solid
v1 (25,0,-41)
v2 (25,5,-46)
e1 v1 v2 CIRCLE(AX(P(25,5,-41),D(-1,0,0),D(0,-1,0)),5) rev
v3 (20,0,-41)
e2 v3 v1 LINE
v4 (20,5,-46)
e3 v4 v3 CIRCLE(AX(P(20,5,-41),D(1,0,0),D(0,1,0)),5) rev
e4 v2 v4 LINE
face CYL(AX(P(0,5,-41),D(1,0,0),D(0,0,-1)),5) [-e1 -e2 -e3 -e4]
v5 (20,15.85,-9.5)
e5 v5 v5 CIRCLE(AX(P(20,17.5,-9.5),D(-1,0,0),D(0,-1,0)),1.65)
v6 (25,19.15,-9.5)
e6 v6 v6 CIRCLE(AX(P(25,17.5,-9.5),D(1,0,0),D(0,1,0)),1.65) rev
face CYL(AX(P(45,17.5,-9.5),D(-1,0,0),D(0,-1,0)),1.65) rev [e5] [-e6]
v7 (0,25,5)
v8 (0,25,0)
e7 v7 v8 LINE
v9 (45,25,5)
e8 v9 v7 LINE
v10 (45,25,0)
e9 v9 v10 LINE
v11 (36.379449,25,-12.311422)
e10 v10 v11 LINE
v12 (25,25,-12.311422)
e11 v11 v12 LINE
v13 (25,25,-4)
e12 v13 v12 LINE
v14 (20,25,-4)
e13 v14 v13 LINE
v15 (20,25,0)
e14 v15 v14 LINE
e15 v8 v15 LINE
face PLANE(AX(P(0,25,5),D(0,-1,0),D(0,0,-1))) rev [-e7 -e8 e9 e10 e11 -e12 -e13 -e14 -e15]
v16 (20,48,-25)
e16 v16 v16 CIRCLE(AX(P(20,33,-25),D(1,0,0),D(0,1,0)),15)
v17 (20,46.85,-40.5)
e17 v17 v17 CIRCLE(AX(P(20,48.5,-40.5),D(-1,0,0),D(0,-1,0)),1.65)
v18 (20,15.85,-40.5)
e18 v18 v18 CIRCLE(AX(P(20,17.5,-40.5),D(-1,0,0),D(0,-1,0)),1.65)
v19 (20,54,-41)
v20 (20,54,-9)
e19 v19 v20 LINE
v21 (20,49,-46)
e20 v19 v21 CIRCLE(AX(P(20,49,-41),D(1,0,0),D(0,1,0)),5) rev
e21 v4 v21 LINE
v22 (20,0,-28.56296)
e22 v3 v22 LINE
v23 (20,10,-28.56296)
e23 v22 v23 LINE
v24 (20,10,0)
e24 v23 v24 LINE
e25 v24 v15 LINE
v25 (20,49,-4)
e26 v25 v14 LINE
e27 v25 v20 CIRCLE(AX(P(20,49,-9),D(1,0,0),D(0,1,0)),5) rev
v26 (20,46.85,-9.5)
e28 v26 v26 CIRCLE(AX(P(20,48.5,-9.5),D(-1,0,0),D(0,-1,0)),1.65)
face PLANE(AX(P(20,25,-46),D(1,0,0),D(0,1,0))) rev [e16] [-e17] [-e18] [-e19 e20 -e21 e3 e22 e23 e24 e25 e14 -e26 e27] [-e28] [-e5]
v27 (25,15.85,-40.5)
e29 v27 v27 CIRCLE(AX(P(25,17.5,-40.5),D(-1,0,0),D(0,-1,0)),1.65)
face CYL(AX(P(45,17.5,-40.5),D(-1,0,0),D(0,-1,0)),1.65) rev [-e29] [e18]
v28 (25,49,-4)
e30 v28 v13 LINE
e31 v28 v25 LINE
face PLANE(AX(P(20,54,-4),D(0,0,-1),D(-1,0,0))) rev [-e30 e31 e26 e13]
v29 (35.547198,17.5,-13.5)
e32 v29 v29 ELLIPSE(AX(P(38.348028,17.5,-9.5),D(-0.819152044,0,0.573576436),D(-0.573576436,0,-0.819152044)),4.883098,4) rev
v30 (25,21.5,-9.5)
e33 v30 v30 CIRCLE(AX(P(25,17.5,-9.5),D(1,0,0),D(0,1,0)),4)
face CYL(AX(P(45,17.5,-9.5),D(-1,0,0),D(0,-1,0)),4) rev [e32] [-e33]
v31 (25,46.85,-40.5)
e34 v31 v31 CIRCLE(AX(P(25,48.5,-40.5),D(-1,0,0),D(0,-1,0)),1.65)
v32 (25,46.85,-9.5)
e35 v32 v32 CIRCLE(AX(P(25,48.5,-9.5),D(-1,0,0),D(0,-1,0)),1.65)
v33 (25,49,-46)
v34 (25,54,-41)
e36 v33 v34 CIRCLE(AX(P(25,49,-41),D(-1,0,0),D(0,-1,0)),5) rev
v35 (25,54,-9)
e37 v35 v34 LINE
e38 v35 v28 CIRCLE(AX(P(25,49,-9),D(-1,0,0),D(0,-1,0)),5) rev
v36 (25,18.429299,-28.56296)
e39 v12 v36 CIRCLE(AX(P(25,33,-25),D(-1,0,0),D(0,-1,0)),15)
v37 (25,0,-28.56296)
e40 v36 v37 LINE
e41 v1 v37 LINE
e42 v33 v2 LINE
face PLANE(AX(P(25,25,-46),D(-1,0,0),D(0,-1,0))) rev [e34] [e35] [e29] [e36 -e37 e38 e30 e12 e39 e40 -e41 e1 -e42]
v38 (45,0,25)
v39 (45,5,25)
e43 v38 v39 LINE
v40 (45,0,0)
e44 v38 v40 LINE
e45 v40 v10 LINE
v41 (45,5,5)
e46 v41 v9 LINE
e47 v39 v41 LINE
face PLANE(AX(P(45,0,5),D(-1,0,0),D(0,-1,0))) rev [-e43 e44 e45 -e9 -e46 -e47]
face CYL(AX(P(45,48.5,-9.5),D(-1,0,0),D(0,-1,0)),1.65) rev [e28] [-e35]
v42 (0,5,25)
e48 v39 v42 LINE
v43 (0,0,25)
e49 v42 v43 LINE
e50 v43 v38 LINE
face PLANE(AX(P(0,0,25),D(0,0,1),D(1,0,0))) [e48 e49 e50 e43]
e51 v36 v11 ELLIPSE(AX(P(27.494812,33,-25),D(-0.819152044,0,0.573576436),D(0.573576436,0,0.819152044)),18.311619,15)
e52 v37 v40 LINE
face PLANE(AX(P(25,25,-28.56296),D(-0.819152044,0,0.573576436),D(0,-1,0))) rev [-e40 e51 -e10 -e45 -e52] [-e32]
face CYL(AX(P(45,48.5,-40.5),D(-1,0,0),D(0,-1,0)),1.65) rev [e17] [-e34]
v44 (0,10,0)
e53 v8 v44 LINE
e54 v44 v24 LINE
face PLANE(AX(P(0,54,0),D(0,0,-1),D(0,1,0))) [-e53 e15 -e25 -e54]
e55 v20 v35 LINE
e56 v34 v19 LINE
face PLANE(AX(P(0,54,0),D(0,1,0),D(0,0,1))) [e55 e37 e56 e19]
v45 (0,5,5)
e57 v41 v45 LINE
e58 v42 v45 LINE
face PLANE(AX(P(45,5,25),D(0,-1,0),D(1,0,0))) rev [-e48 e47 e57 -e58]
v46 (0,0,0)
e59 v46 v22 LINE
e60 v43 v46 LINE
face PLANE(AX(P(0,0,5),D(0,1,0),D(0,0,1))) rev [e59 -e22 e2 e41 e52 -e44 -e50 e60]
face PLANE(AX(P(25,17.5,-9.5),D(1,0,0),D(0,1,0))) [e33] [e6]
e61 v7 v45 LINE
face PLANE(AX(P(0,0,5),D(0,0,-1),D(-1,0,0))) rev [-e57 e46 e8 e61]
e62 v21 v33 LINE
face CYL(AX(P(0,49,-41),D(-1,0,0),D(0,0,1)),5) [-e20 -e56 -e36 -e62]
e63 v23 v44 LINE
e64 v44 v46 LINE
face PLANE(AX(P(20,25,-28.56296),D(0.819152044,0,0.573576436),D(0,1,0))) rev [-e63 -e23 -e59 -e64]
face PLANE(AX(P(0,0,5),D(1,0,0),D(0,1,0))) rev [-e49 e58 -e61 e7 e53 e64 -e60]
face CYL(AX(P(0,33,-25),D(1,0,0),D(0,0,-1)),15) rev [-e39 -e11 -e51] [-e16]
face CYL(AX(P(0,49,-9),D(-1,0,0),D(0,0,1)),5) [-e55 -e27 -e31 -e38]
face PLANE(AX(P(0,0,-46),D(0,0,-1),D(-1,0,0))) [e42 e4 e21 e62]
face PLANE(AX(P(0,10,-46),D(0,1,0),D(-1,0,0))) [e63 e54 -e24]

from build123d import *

# Parameters (mm, degrees)
SKETCH1_W               = 45
SKETCH1_H               = 25
BOSS_EXTRUDE1_DEPTH     = 5
SKETCH2_W               = 5
SKETCH2_H               = 25
BOSS_EXTRUDE2_DEPTH     = 46
SKETCH3_W               = 45
SKETCH3_H               = 5
BOSS_EXTRUDE3_DEPTH     = 20
CHAMFER2_SIZE2          = 20
CHAMFER2_SIZE           = 28.562960135
CHAMFER3_SIZE2          = 20
CHAMFER3_SIZE           = 28.562960135
SKETCH4_W               = 5
SKETCH4_H               = 42
BOSS_EXTRUDE4_DEPTH     = 29
CUT_EXTRUDE1_DEPTH      = 76.213030786
CUT_EXTRUDE1_DEPTH_BACK = 76.213030786
SKETCH6_R               = 15
SKETCH7_W               = 46
SKETCH7_H               = 44
CUT_EXTRUDE2_DEPTH      = 76.213030786
SKETCH8_R               = 1.65
CUT_EXTRUDE3_DEPTH      = 76.213030786
SKETCH9_R               = 4
CUT_EXTRUDE4_DEPTH      = 76.213030786
FILLET1_R               = 5


with BuildPart() as part:
    # Sketch1 → Boss-Extrude1 (new body)
    with BuildSketch(Plane.XY):
        with Locations((22.5, 12.5)):
            Rectangle(SKETCH1_W, SKETCH1_H)
    extrude(amount=BOSS_EXTRUDE1_DEPTH)

    # Sketch2 → Boss-Extrude2 (add)
    with BuildSketch(Plane(origin=(0, 0, 0), x_dir=(-1, 0, 0), z_dir=(0, 0, -1))):
        with Locations((-22.5, 12.5)):
            Rectangle(SKETCH2_W, SKETCH2_H)
    extrude(amount=BOSS_EXTRUDE2_DEPTH)

    # Sketch3 → Boss-Extrude3 (add)
    with BuildSketch(Plane.XY.offset(5)):
        with Locations((22.5, 2.5)):
            Rectangle(SKETCH3_W, SKETCH3_H)
    extrude(amount=BOSS_EXTRUDE3_DEPTH)

    # Chamfer2
    chamfer2_edges = [part.edges().sort_by_distance(p)[0] for p in [
        (25, 12.5, 0),
    ]]
    chamfer2_side = [part.faces().sort_by_distance(p)[0] for p in [
        (25, 12.5, -0.4),
    ]]
    chamfer(chamfer2_edges, length=CHAMFER2_SIZE - 0.0001, length2=CHAMFER2_SIZE2 - 0.0001, reference=chamfer2_side[0])  # a hair under: the kernel refuses the full size

    # Chamfer3
    chamfer3_edges = [part.edges().sort_by_distance(p)[0] for p in [
        (20, 12.5, 0),
    ]]
    chamfer3_side = [part.faces().sort_by_distance(p)[0] for p in [
        (20, 12.5, -0.4),
    ]]
    chamfer(chamfer3_edges, length=CHAMFER3_SIZE - 0.0001, length2=CHAMFER3_SIZE2 - 0.0001, reference=chamfer3_side[0])  # a hair under: the kernel refuses the full size

    # Sketch4 → Boss-Extrude4 (add)
    with BuildSketch(Plane(origin=(0, 25, 0), x_dir=(1, 0, 0), z_dir=(0, 1, 0))):
        with Locations((22.5, 25)):
            Rectangle(SKETCH4_W, SKETCH4_H)
    extrude(amount=BOSS_EXTRUDE4_DEPTH)

    # Sketch6 → Cut-Extrude1 (cut, two sides: drawn at the far end of the back side and taken through both)
    with BuildSketch(Plane(origin=(25, 0, 0), x_dir=(0, 0, -1), z_dir=(1, 0, 0)).offset(-CUT_EXTRUDE1_DEPTH_BACK)):
        with Locations(Location((25, 33, 0), (0, 0, 283.740844537))):
            Circle(SKETCH6_R)
    extrude(amount=CUT_EXTRUDE1_DEPTH + CUT_EXTRUDE1_DEPTH_BACK, mode=Mode.SUBTRACT)

    # Sketch7 → Cut-Extrude2 (cut, through all)
    with BuildSketch(Plane.ZY.offset(-20)):
        with Locations((-23, 32)):
            Rectangle(SKETCH7_W, SKETCH7_H)
    extrude(amount=CUT_EXTRUDE2_DEPTH, mode=Mode.SUBTRACT)

    # Sketch8 → Cut-Extrude3 (cut, through all)
    with BuildSketch(Plane.ZY.offset(-20)):
        with Locations(Location((-40.5, 48.5, 0), (0, 0, 270))):
            Circle(SKETCH8_R)
        with Locations(Location((-9.5, 48.5, 0), (0, 0, 270))):
            Circle(SKETCH8_R)
        with Locations(Location((-9.5, 17.5, 0), (0, 0, 270))):
            Circle(SKETCH8_R)
        with Locations(Location((-40.5, 17.5, 0), (0, 0, 270))):
            Circle(SKETCH8_R)
    extrude(amount=-CUT_EXTRUDE3_DEPTH, mode=Mode.SUBTRACT)

    # Sketch9 → Cut-Extrude4 (cut, through all)
    with BuildSketch(Plane(origin=(25, 0, 0), x_dir=(0, 0, -1), z_dir=(1, 0, 0))):
        with Locations((9.5, 17.5)):
            Circle(SKETCH9_R)
    extrude(amount=CUT_EXTRUDE4_DEPTH, mode=Mode.SUBTRACT)

    # Fillet1
    fillet1_edges = [part.edges().sort_by_distance(p)[0] for p in [
        (22.5, 0, -46),
        (22.5, 54, -4),
        (22.5, 54, -46),
    ]]
    fillet(fillet1_edges, radius=FILLET1_R)


solid = part.part
